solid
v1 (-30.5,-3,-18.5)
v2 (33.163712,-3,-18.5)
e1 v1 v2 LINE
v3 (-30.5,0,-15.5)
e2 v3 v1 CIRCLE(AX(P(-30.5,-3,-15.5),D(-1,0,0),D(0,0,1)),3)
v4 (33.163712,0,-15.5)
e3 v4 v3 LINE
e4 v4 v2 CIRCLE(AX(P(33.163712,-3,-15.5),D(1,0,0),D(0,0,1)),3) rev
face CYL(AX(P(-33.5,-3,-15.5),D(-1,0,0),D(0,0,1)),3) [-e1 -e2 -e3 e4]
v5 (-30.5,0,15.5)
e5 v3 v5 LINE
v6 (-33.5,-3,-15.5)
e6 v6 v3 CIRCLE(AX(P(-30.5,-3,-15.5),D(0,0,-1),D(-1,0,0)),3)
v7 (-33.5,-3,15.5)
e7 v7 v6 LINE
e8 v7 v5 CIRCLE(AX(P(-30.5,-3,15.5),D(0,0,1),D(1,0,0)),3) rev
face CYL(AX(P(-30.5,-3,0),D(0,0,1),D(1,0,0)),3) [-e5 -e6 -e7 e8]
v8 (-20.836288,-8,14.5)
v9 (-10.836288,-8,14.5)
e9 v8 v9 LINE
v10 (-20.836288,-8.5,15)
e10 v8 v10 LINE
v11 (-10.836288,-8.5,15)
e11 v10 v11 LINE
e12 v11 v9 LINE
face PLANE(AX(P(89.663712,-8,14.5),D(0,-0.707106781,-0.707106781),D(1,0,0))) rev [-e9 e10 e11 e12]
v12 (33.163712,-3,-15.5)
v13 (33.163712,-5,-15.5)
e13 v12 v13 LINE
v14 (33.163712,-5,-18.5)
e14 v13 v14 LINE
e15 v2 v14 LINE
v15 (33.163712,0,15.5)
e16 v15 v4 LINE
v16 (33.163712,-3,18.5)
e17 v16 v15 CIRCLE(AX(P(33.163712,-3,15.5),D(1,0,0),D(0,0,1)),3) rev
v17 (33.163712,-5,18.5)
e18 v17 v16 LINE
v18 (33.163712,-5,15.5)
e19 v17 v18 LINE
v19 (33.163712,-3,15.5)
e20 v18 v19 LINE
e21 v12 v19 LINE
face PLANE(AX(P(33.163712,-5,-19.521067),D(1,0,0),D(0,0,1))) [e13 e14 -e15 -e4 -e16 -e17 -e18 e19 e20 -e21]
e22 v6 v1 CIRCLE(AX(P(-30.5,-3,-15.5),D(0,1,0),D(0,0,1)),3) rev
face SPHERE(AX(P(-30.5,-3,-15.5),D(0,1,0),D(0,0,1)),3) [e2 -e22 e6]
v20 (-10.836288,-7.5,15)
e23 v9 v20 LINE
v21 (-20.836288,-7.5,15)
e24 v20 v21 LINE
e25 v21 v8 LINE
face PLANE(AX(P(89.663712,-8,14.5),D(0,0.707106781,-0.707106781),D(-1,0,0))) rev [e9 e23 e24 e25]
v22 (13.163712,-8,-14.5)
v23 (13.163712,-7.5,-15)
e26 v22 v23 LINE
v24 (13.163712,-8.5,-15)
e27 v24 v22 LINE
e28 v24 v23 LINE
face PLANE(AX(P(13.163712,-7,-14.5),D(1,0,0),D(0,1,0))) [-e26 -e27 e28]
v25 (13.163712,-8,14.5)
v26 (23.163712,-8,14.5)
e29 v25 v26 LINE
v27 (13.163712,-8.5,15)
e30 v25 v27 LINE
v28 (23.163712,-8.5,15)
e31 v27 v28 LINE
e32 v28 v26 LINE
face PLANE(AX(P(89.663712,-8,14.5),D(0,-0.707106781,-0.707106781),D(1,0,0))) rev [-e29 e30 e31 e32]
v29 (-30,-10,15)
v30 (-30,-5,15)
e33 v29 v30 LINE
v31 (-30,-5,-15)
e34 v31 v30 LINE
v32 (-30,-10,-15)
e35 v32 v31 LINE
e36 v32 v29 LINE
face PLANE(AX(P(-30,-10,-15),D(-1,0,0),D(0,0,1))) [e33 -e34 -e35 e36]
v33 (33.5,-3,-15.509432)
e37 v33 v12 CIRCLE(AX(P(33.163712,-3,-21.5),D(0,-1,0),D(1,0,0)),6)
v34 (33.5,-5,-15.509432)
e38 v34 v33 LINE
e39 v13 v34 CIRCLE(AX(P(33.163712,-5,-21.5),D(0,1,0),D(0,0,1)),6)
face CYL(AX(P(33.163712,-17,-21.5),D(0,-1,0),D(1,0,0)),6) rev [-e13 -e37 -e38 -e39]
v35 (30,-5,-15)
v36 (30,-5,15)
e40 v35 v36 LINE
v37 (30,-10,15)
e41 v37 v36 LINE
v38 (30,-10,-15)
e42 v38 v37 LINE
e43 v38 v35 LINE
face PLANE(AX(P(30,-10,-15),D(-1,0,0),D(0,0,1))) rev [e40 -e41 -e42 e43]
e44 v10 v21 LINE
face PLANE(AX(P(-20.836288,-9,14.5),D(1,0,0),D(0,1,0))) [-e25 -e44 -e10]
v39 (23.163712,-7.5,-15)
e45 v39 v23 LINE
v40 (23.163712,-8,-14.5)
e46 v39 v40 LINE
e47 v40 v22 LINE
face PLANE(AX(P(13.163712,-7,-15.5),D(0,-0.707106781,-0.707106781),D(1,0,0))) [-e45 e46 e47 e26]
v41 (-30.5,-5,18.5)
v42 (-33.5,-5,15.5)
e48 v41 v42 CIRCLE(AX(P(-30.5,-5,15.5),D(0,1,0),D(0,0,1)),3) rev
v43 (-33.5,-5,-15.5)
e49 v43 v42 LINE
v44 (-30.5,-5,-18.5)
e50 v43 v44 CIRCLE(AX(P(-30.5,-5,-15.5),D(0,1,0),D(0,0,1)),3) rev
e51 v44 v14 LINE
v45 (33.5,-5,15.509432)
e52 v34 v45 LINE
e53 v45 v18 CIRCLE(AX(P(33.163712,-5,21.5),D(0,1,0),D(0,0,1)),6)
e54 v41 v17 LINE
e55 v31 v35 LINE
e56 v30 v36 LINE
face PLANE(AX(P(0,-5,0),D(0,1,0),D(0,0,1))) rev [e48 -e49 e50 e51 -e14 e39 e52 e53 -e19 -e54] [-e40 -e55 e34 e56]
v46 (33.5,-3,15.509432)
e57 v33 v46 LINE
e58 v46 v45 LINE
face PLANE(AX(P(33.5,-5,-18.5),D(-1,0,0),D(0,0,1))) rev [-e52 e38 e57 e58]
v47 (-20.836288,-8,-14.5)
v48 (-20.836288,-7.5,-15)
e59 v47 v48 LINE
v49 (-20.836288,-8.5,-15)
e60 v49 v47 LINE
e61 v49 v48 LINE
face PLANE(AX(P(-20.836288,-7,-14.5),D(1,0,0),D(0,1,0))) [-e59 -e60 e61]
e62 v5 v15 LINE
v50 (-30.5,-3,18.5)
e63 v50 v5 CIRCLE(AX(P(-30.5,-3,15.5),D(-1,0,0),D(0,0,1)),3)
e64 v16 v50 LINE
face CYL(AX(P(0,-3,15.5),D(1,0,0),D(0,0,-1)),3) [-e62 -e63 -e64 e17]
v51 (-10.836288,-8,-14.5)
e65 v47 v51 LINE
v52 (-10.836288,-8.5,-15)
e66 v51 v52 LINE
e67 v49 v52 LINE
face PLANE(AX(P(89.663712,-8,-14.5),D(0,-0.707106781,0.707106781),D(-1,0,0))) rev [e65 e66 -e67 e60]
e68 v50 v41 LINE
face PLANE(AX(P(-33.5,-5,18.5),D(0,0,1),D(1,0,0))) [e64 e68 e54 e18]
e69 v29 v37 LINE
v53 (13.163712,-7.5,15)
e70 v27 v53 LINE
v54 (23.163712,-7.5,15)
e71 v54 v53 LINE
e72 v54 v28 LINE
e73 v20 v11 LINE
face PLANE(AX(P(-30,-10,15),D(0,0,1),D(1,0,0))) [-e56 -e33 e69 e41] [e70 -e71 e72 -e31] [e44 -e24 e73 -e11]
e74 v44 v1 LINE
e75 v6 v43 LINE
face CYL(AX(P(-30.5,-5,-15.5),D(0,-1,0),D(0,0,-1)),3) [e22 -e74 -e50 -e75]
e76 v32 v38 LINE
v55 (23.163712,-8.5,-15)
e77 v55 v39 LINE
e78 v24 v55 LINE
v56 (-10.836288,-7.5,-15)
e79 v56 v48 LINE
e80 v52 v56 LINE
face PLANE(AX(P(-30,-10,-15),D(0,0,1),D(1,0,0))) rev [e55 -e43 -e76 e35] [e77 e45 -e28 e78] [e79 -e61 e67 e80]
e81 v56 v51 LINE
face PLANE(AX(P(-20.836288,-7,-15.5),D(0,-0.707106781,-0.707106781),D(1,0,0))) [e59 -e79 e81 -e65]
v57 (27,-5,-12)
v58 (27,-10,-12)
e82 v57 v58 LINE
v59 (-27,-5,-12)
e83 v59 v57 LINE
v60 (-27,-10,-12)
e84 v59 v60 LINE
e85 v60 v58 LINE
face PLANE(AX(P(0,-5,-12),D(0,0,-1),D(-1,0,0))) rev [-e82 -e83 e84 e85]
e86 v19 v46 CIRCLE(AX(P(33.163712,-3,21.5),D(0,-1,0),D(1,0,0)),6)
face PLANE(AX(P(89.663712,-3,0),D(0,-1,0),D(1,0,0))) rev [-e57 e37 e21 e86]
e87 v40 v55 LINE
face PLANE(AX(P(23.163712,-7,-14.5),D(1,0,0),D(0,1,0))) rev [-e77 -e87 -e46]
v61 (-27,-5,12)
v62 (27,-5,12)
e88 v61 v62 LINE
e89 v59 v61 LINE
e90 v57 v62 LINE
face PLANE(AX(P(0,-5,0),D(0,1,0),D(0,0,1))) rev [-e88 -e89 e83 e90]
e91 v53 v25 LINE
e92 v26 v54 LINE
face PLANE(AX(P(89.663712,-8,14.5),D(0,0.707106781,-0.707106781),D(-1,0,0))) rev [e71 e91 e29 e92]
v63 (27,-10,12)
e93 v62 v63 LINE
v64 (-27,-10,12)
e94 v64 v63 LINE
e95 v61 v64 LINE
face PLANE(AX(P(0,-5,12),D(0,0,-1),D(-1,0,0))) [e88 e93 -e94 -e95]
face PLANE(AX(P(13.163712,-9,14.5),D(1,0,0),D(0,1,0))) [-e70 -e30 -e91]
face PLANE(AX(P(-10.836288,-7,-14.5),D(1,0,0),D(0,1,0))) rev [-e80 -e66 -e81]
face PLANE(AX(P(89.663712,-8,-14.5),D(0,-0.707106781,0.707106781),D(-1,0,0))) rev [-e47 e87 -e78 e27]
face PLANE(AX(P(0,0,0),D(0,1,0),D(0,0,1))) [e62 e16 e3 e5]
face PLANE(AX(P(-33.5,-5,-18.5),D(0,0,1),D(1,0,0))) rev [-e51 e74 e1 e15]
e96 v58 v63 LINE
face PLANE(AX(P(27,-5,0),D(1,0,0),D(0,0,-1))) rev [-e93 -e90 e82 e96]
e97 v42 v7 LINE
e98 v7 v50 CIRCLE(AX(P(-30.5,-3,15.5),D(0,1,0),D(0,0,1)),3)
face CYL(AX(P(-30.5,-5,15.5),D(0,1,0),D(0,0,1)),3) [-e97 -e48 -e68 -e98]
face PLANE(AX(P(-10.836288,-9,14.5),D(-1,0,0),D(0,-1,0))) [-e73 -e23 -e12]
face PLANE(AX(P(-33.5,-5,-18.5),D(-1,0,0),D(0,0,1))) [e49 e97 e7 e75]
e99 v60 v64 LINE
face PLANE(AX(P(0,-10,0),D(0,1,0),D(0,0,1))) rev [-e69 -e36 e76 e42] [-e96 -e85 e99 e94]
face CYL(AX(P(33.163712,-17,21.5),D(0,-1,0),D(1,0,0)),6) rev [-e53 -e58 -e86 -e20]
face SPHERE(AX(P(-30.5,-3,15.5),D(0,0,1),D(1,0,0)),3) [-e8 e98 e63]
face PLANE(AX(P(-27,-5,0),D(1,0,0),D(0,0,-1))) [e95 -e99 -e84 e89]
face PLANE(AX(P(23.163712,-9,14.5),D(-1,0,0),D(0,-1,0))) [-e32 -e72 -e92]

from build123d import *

# Parameters (mm, degrees)
SKETCH1_W           = 67
SKETCH1_H           = 37
BOSS_EXTRUDE2_DEPTH = 5
SKETCH1_4_W         = 60
SKETCH1_4_H         = 30
BOSS_EXTRUDE3_DEPTH = 10
CUT_EXTRUDE1_START  = -10
SKETCH1_6_W         = 54
SKETCH1_6_H         = 24
CUT_EXTRUDE1_DEPTH  = 5
FILLET1_R           = 3
CAVITY1_START       = -3
CAVITY1_OUTLINE_W   = 0.336287878
CAVITY1_OUTLINE_H   = 40
CAVITY1_DEPTH       = 3
CAVITY1_START_2     = -5
CAVITY1_2_DEPTH     = 2
CAVITY1_START_3     = -16.617009358
CAVITY1_3_OUTLINE_W = 10
CAVITY1_3_OUTLINE_H = 2.403805922
CAVITY1_3_DEPTH     = 0.707106781
CAVITY1_START_4     = 4.596194078
CAVITY1_4_OUTLINE_W = 10
CAVITY1_4_OUTLINE_H = 2.090097423
CAVITY1_4_DEPTH     = 0.707106781


# Read off the part's stored shape, not the designer's step: Cavity1
with BuildPart() as part:
    # Sketch1 → Boss-Extrude2 (new body)
    with BuildSketch(Plane(origin=(0, 0, 0), x_dir=(1, 0, 0), z_dir=(0, 1, 0))):
        Rectangle(SKETCH1_W, SKETCH1_H)
    extrude(amount=-BOSS_EXTRUDE2_DEPTH)

    # Sketch1<4> → Boss-Extrude3 (add)
    with BuildSketch(Plane(origin=(0, 0, 0), x_dir=(1, 0, 0), z_dir=(0, 1, 0))):
        Rectangle(SKETCH1_4_W, SKETCH1_4_H)
    extrude(amount=-BOSS_EXTRUDE3_DEPTH)

    # Sketch1<6> → Cut-Extrude1 (cut)
    with BuildSketch(Plane(origin=(0, 0, 0), x_dir=(1, 0, 0), z_dir=(0, 1, 0)).offset(CUT_EXTRUDE1_START)):
        Rectangle(SKETCH1_6_W, SKETCH1_6_H)
    extrude(amount=CUT_EXTRUDE1_DEPTH, mode=Mode.SUBTRACT)

    # Fillet1
    fillet1_edges = [part.edges().sort_by_distance(p)[0] for p in [
        (0, 0, -18.5),
        (0, 0, 18.5),
        (-33.5, 0, 0),
        (-33.5, -2.5, -18.5),
        (-33.5, -2.5, 18.5),
    ]]
    fillet(fillet1_edges, radius=FILLET1_R)

    # Cavity1 outline → Cavity1 (cut)
    with BuildSketch(Plane(origin=(0, 0, 0), x_dir=(1, 0, 0), z_dir=(0, 1, 0)).offset(CAVITY1_START)):
        with Locations((33.331856061, 0)):
            Rectangle(CAVITY1_OUTLINE_W, CAVITY1_OUTLINE_H)
    extrude(amount=CAVITY1_DEPTH, mode=Mode.SUBTRACT)

    # Cavity1 2 outline → Cavity1 2 (cut)
    with BuildSketch(Plane(origin=(0, 0, 0), x_dir=(1, 0, 0), z_dir=(0, 1, 0)).offset(CAVITY1_START_2)):
        with BuildLine():
            Line((33.163712122, -15.5), (33.163712122, -20))
            Line((33.163712122, -20), (33.5, -20))
            Line((33.5, -20), (33.5, -15.509431541))
            ThreePointArc((33.5, -15.509431541), (33.331922177, -15.502358349), (33.163712122, -15.5))
        make_face()
        with BuildLine():
            Line((33.163712122, 20), (33.163712122, 15.5))
            ThreePointArc((33.163712122, 15.5), (33.331922177, 15.502358349), (33.5, 15.509431541))
            Line((33.5, 15.509431541), (33.5, 20))
            Line((33.5, 20), (33.163712122, 20))
        make_face()
    extrude(amount=CAVITY1_2_DEPTH, mode=Mode.SUBTRACT)

    # Cavity1 3 outline → Cavity1 3 (cut)
    with BuildSketch(Plane(origin=(0, 0, 0), x_dir=(1, 0, 0), z_dir=(0, 0.70710678118654, 0.707106781186555)).offset(CAVITY1_START_3)):
        with Locations((18.163712122, 5.798097039)):
            Rectangle(CAVITY1_3_OUTLINE_W, CAVITY1_3_OUTLINE_H)
        with Locations((-15.836287878, 5.798097039)):
            Rectangle(CAVITY1_3_OUTLINE_W, CAVITY1_3_OUTLINE_H)
    extrude(amount=CAVITY1_3_DEPTH, mode=Mode.SUBTRACT)

    # Cavity1 4 outline → Cavity1 4 (cut)
    with BuildSketch(Plane(origin=(0, 0, 0), x_dir=(1, 0, 0), z_dir=(0, 0.70710678118654, 0.707106781186555)).offset(CAVITY1_START_4)):
        with Locations((18.163712122, -16.954951288)):
            Rectangle(CAVITY1_4_OUTLINE_W, CAVITY1_4_OUTLINE_H)
        with Locations((-15.836287878, -16.954951288)):
            Rectangle(CAVITY1_4_OUTLINE_W, CAVITY1_4_OUTLINE_H)
    extrude(amount=CAVITY1_4_DEPTH, mode=Mode.SUBTRACT)


solid = part.part
